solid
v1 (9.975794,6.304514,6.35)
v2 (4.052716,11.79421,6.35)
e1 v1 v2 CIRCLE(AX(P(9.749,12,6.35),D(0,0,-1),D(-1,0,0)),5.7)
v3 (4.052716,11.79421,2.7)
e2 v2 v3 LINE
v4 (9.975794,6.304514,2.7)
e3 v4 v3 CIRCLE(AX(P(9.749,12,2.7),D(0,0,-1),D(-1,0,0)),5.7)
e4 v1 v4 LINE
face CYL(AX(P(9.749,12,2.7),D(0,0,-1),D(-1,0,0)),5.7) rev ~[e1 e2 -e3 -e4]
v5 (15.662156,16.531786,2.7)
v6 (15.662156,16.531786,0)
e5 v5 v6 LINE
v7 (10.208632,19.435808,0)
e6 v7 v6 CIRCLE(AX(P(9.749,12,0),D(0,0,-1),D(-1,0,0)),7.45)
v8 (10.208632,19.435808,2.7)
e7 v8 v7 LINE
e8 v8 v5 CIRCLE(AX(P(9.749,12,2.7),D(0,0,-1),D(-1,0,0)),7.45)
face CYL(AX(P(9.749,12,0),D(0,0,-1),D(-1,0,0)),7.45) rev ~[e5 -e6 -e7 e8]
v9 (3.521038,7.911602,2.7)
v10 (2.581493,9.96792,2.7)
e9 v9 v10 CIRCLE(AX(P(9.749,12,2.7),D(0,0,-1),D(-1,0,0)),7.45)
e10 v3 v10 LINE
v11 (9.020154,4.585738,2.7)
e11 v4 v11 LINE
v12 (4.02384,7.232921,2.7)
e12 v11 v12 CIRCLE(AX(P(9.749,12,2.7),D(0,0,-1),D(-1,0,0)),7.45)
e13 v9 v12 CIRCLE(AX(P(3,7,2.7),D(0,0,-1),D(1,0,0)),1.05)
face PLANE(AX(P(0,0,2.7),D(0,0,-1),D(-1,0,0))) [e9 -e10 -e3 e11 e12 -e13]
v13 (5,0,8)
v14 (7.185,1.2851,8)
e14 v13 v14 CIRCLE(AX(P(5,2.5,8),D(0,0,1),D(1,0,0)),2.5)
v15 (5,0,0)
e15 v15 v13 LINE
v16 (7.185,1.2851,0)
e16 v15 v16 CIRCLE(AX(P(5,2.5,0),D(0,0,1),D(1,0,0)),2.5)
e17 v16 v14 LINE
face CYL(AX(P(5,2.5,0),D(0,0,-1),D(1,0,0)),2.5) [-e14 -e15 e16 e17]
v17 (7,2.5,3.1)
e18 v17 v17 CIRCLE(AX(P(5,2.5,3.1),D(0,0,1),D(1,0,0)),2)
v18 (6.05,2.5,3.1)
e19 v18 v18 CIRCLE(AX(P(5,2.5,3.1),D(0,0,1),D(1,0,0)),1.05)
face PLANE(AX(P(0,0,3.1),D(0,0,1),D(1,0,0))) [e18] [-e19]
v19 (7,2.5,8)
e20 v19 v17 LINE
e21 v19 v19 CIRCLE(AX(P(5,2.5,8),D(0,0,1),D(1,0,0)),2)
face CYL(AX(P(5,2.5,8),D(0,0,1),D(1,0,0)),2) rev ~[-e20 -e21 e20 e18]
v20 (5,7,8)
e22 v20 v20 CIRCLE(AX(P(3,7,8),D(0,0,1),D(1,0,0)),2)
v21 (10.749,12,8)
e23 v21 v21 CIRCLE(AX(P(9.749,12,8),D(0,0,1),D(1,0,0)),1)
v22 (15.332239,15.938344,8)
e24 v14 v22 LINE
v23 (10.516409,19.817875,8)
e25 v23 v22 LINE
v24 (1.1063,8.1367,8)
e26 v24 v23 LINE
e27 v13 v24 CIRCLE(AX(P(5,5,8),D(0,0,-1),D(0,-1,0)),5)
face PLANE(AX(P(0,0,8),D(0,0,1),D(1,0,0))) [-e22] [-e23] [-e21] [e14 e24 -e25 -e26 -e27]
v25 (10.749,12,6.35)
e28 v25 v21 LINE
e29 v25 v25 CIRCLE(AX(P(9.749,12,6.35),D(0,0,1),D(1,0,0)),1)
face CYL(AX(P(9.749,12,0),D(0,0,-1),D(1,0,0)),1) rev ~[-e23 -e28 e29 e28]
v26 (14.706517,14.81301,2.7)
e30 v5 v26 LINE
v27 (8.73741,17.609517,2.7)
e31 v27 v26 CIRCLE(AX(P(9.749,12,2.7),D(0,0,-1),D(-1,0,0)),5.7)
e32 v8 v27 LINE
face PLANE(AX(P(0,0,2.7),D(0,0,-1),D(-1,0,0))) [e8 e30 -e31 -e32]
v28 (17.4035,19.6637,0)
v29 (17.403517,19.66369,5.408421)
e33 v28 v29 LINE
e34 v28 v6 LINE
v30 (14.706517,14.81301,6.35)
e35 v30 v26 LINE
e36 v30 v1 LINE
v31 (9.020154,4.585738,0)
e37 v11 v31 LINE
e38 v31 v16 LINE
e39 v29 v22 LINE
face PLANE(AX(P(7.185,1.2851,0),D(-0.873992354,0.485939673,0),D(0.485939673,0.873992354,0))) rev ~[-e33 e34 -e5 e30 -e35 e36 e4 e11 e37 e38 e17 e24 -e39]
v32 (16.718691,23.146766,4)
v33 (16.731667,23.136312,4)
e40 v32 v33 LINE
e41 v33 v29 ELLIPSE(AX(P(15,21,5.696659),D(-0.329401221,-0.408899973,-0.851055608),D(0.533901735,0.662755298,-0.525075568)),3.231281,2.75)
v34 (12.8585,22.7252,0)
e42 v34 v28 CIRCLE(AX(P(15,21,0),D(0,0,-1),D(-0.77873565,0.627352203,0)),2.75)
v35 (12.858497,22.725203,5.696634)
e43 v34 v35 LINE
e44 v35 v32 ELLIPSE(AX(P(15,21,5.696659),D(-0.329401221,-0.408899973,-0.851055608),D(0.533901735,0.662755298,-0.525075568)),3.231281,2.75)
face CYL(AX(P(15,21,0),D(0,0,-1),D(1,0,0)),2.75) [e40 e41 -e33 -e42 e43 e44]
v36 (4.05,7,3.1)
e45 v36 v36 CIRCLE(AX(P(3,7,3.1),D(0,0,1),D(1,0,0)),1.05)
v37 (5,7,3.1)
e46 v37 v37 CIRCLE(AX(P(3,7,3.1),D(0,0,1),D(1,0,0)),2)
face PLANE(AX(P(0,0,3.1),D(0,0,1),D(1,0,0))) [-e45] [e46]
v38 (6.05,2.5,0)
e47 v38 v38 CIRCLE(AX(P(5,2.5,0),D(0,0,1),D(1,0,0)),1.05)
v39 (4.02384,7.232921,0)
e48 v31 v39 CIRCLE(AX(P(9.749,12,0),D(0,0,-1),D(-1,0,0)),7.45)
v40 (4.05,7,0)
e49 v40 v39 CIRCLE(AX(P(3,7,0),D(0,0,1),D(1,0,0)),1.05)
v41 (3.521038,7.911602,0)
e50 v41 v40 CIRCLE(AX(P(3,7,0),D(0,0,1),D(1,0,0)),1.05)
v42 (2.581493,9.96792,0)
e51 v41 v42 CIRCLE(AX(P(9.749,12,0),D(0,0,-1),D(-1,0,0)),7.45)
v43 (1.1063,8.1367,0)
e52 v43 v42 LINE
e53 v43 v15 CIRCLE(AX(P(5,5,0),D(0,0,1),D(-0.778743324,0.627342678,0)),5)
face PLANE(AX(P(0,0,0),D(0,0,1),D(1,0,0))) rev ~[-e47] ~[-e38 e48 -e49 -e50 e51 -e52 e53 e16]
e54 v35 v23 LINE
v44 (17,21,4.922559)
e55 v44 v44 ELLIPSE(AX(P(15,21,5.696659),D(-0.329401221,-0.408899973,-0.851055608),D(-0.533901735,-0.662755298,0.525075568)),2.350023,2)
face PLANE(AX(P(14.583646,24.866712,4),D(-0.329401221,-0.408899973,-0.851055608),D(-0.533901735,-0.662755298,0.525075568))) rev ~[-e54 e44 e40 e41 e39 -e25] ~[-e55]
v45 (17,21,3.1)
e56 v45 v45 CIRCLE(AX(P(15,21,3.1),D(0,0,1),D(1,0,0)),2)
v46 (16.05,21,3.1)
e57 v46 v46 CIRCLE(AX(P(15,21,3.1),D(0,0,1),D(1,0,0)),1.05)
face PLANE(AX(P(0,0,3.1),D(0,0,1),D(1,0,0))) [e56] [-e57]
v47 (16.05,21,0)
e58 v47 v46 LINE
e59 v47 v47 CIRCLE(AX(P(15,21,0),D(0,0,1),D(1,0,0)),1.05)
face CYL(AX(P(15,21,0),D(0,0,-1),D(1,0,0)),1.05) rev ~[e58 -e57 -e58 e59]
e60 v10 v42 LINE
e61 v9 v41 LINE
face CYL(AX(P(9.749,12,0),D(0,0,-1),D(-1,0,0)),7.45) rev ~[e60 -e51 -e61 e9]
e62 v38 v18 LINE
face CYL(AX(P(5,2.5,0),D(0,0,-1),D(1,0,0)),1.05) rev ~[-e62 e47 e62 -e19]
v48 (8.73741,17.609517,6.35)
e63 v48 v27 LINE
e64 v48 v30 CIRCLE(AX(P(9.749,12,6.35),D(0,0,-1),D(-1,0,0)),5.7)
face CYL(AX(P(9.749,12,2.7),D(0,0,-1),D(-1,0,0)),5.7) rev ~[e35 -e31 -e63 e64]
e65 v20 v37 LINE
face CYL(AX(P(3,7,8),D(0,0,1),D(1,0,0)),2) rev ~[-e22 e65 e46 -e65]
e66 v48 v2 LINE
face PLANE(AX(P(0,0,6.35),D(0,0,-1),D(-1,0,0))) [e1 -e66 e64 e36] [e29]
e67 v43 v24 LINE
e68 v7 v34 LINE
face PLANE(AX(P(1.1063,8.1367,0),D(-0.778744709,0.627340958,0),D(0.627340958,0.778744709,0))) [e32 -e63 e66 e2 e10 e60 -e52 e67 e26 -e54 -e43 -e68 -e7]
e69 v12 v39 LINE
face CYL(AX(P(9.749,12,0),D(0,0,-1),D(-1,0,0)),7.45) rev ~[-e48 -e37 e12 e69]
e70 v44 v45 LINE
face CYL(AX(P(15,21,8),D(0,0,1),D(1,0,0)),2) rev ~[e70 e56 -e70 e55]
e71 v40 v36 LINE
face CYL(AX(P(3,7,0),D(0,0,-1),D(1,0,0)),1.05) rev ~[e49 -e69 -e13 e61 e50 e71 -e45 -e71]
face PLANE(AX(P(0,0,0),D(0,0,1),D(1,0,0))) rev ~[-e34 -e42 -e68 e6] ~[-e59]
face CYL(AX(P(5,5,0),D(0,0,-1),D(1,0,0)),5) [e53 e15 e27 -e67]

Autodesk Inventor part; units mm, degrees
ref_plane "YZ Plane" through (0, 0, 0) normal (1, 0, 0) x (0, 1, 0)
ref_plane "XZ Plane" through (0, 0, 0) normal (0, 1, 0) x (-1, 0, 0)
ref_plane "XY Plane" through (0, 0, 0) normal (0, 0, 1) x (1, 0, 0)
sketch "Sketch1" plane through (0, 0, 0) normal (0, 0, 1) x (1, 0, 0)
  line L0 (0, 0) -> (18, 0)
  line L1 (18, 0) -> (18, 24)
  line L2 (18, 24) -> (0, 24)
  line L3 (0, 24) -> (0, 0)
  circle A0 centre (15, 21) radius 1.05
  circle A1 centre (5, 2.5) radius 1.05
  circle A2 centre (3, 7) radius 1.05
  line L4 (0, 10) -> (11.3137, 10) construction
  line L5 (6, 0) -> (28.3492, 0) construction
  line L6 (6, 0) -> (42, 0) construction
  circle A3 centre (9.749, 12) radius 1
  circle A4 centre (15, 21) radius 2.75
  circle A5 centre (5, 5) radius 5
  line L7 (1.1063, 8.1367) -> (12.8585, 22.7252)
  circle A6 centre (5, 2.5) radius 2.5
  line L8 (7.185, 1.2851) -> (17.4035, 19.6637)
  point P0 (8, 24)
  point P1 (18, 31.1769)
  point P2 (9.5257, 2.8745)
  point P3 (17.4892, 19.831)
  point P4 (5, 0)
  dimension "d0" = 18
  dimension "d1" = 24
  dimension "d2" = 2.1
  dimension "d3" = 3
  dimension "d4" = 3
  dimension "d5" = 2.1
  dimension "d6" = 2.1
  dimension "d7" = 2.5
  dimension "d8" = 5
  dimension "d9" = 3
  dimension "d10" = 7
  dimension "d12" = 10
  dimension "d15" = 6
  dimension "d18" = 2
  dimension "d25" = 5.5
  dimension "d26" = 10
  dimension "d30" = 12
  dimension "d31" = 8.251
extrude "Extrusion1" add sketch "Sketch1" along normal blind 8 contours A5 L8 A6 | A6 | L7 A4 L8 A5 | A4 picked at (5.8937, 6.9979)
sketch "Sketch3" plane through (0, 0, 0) normal (0, 0, -1) x (-1, 0, 0)
  circle A0 centre (-9.749, 12) radius 1 projected
  circle A1 centre (-9.749, 12) radius 7.45
  point P0 (0, 0)
  dimension "d27" = 14.9
extrude "Extrusion2" cut sketch "Sketch3" against normal blind 2.7
sketch "Sketch5" plane through (0, 0, 8) normal (0, 0, 1) x (1, 0, 0)
  circle A0 centre (3, 7) radius 1.05 projected
  circle A1 centre (5, 2.5) radius 1.05 projected
  circle A2 centre (15, 21) radius 1.05 projected
  circle A3 centre (3, 7) radius 2
  circle A4 centre (5, 2.5) radius 2
  circle A5 centre (15, 21) radius 2
  point P0 (0, 0)
  dimension "d32" = 4
  dimension "d33" = 4
  dimension "d34" = 4
extrude "Extrusion3" cut sketch "Sketch5" against normal blind 4.9
sketch "Sketch6" plane through (0, 0, 2.7) normal (0, 0, -1) x (-1, 0, 0)
  circle A0 centre (-9.749, 12) radius 1 projected
  circle A1 centre (-9.749, 12) radius 1 projected
  circle A2 centre (-9.749, 12) radius 5.7
  point P0 (0, 0)
  dimension "d37" = 11.4
extrude "Extrusion4" cut sketch "Sketch6" against normal blind 3.65
sketch "Sketch8" plane through (1.1063, 8.1367, 0) normal (-0.778745, 0.6273406, 0) x (0, 0, 1)
  line L0 (0, 21.4833) -> (8, 21.4833) projected
  line L1 (8, 18.7333) -> (8, 0) projected
  line L2 (8, 18.7333) -> (8, 21.4833) projected
  line L3 (4, 21.4833) -> (8, 15)
  line L4 (8, -1.5222) -> (8, 19.2005) projected
  point P0 (0, -7.0304)
  point P1 (8, 15)
extrude "Extrusion5" cut sketch "Sketch8" against normal up to surface surface through (7.185, 1.2851, 0) normal (0.8739914, -0.4859413, 0)
properties part number "PartD_3D"
